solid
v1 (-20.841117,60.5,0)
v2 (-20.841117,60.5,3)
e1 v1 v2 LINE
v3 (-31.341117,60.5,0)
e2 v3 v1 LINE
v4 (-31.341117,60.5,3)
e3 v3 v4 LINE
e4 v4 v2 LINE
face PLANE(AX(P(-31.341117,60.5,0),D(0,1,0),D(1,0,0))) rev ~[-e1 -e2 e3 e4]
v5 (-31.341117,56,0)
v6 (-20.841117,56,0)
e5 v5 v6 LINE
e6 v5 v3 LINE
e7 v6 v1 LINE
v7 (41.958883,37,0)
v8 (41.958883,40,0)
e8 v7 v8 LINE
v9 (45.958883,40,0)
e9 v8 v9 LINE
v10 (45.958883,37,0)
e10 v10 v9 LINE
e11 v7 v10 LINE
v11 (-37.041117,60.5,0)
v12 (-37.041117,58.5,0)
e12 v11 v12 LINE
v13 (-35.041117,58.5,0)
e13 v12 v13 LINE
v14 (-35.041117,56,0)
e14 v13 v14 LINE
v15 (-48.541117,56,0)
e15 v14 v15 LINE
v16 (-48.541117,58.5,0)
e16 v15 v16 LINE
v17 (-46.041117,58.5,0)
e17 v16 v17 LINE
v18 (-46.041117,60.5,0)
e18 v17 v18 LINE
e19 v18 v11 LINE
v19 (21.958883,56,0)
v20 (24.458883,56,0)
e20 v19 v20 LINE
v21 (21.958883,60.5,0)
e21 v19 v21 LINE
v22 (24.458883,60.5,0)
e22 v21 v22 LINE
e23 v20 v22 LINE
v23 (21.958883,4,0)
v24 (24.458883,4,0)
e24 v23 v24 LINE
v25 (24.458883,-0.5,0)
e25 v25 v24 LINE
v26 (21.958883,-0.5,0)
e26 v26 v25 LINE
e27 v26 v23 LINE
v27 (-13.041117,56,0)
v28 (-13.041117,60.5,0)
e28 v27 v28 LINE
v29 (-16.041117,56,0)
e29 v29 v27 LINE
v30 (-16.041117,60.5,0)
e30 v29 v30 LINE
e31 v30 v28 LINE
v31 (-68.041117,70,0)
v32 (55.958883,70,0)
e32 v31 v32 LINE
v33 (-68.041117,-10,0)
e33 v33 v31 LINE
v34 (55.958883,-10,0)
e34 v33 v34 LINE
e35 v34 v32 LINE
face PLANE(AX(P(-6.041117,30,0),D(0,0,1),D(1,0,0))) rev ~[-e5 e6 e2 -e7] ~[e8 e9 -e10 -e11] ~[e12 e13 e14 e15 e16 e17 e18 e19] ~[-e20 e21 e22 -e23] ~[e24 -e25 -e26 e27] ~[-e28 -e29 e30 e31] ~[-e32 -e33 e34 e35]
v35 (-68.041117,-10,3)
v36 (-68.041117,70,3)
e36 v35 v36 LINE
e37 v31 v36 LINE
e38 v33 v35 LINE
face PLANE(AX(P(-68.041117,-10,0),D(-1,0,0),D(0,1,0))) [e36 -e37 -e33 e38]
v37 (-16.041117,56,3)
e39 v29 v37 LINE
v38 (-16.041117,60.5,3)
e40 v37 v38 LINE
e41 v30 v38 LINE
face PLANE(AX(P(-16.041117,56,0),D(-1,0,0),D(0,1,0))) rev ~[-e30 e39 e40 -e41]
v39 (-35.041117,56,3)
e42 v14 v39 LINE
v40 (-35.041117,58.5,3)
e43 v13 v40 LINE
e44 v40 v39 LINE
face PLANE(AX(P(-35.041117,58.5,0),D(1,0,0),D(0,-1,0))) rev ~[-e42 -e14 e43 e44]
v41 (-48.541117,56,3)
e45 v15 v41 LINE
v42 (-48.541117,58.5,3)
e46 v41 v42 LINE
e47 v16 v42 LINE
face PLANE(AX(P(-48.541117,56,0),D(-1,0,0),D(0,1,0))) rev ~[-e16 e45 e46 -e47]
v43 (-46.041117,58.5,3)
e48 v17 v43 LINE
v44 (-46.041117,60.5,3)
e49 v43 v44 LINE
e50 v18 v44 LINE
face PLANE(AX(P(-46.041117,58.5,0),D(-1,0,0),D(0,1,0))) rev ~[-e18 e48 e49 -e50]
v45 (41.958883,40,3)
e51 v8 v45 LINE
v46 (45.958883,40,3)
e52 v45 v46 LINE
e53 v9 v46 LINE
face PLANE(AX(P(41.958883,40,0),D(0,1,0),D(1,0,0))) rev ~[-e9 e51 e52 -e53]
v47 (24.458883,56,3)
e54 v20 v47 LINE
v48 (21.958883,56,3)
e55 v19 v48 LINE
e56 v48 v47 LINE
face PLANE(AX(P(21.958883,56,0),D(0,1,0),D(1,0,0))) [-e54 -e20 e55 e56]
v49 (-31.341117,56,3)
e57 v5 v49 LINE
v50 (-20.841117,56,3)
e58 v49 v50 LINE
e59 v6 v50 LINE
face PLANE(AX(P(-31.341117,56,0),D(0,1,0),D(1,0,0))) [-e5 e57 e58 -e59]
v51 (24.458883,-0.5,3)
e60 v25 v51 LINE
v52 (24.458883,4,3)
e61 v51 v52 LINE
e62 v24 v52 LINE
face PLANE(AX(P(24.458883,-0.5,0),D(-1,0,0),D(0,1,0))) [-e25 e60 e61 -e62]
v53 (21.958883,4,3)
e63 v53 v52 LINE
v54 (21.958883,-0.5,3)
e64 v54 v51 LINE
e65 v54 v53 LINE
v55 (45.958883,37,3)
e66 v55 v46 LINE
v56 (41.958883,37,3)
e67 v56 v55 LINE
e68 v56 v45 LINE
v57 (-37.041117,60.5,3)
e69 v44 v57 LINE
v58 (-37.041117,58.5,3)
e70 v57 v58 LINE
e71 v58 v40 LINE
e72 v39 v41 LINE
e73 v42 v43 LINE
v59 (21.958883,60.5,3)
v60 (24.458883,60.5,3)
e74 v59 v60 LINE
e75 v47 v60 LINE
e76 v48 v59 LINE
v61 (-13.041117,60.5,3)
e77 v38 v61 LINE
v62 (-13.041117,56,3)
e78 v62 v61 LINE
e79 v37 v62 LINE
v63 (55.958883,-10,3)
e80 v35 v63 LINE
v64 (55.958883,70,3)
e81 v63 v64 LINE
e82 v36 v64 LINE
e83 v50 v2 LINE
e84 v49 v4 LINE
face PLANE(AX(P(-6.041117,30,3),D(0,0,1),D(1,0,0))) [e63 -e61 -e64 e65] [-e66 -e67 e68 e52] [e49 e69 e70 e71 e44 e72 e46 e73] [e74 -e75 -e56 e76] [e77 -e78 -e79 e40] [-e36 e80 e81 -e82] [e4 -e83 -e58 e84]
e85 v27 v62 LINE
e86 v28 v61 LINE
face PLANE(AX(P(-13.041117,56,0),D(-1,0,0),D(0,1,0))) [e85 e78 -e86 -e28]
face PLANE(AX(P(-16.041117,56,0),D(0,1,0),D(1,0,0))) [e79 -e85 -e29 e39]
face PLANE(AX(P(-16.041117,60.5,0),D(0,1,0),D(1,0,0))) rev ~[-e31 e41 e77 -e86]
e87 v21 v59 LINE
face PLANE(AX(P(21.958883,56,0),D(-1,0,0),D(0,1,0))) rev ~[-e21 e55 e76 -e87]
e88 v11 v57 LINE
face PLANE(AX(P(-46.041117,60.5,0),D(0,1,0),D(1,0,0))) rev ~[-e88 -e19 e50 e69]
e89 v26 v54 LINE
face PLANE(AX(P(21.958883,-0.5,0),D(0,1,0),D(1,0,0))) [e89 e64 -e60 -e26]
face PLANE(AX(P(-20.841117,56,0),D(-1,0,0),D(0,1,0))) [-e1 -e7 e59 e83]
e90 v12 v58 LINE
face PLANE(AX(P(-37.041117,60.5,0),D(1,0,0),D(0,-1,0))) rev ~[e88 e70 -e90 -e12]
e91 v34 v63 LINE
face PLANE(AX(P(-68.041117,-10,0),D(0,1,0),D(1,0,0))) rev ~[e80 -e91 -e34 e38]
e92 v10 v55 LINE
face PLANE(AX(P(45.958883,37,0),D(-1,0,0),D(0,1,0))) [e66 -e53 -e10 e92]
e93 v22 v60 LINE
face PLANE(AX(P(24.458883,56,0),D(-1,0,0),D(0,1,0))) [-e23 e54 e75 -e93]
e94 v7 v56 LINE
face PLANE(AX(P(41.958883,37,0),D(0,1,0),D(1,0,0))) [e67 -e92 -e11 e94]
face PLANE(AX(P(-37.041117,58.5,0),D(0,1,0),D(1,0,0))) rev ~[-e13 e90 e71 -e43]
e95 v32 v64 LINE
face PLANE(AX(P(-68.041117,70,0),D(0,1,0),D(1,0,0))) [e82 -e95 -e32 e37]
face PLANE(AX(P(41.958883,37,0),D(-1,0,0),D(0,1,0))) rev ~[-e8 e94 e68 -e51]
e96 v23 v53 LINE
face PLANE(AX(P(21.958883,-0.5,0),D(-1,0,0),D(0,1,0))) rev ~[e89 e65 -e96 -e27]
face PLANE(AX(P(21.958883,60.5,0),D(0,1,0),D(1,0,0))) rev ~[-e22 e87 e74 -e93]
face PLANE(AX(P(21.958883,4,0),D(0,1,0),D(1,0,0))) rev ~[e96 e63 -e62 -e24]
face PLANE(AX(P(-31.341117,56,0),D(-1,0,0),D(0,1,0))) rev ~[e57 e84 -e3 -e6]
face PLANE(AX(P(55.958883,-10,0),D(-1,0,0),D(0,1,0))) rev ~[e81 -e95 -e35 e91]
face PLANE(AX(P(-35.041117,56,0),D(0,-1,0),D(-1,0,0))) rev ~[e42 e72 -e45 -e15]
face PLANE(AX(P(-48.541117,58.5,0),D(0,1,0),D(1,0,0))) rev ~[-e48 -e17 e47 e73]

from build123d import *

# Parameters (mm, degrees)
F0_W     = 124
F0_H     = 80
F0_W_2   = 2.5
F0_H_2   = 4.5
F0_W_3   = 10.5
F0_W_4   = 3
F0_W_5   = 4
F0_H_3   = 3
F1_DEPTH = 3


# Not quite as in the source:
# - a feature names something its author has since deleted; it is built from what else it names


with BuildPart() as f1:
    # F0 (on Top) → F1 (new body)
    with BuildSketch(Plane.XY):
        with Locations((-6.0411174464, 30)):
            Rectangle(F0_W, F0_H)
        with Locations((23.2088825536, 1.75)):
            Rectangle(F0_W_2, F0_H_2, mode=Mode.SUBTRACT)
        Polygon((-35.0411174464, 58.5), (-35.0411174464, 56), (-48.5411174464, 56), (-48.5411174464, 58.5), (-46.0411174464, 58.5), (-46.0411174464, 60.5), (-37.0411174464, 60.5), (-37.0411174464, 58.5), align=None, mode=Mode.SUBTRACT)
        with Locations((-26.0911174464, 58.25)):
            Rectangle(F0_W_3, F0_H_2, mode=Mode.SUBTRACT)
        with Locations((-14.5411174464, 58.25)):
            Rectangle(F0_W_4, F0_H_2, mode=Mode.SUBTRACT)
        with Locations((43.9588825536, 38.5)):
            Rectangle(F0_W_5, F0_H_3, mode=Mode.SUBTRACT)
        with Locations((23.2088825536, 58.25)):
            Rectangle(F0_W_2, F0_H_2, mode=Mode.SUBTRACT)
    extrude(amount=F1_DEPTH)


solid = f1.part
